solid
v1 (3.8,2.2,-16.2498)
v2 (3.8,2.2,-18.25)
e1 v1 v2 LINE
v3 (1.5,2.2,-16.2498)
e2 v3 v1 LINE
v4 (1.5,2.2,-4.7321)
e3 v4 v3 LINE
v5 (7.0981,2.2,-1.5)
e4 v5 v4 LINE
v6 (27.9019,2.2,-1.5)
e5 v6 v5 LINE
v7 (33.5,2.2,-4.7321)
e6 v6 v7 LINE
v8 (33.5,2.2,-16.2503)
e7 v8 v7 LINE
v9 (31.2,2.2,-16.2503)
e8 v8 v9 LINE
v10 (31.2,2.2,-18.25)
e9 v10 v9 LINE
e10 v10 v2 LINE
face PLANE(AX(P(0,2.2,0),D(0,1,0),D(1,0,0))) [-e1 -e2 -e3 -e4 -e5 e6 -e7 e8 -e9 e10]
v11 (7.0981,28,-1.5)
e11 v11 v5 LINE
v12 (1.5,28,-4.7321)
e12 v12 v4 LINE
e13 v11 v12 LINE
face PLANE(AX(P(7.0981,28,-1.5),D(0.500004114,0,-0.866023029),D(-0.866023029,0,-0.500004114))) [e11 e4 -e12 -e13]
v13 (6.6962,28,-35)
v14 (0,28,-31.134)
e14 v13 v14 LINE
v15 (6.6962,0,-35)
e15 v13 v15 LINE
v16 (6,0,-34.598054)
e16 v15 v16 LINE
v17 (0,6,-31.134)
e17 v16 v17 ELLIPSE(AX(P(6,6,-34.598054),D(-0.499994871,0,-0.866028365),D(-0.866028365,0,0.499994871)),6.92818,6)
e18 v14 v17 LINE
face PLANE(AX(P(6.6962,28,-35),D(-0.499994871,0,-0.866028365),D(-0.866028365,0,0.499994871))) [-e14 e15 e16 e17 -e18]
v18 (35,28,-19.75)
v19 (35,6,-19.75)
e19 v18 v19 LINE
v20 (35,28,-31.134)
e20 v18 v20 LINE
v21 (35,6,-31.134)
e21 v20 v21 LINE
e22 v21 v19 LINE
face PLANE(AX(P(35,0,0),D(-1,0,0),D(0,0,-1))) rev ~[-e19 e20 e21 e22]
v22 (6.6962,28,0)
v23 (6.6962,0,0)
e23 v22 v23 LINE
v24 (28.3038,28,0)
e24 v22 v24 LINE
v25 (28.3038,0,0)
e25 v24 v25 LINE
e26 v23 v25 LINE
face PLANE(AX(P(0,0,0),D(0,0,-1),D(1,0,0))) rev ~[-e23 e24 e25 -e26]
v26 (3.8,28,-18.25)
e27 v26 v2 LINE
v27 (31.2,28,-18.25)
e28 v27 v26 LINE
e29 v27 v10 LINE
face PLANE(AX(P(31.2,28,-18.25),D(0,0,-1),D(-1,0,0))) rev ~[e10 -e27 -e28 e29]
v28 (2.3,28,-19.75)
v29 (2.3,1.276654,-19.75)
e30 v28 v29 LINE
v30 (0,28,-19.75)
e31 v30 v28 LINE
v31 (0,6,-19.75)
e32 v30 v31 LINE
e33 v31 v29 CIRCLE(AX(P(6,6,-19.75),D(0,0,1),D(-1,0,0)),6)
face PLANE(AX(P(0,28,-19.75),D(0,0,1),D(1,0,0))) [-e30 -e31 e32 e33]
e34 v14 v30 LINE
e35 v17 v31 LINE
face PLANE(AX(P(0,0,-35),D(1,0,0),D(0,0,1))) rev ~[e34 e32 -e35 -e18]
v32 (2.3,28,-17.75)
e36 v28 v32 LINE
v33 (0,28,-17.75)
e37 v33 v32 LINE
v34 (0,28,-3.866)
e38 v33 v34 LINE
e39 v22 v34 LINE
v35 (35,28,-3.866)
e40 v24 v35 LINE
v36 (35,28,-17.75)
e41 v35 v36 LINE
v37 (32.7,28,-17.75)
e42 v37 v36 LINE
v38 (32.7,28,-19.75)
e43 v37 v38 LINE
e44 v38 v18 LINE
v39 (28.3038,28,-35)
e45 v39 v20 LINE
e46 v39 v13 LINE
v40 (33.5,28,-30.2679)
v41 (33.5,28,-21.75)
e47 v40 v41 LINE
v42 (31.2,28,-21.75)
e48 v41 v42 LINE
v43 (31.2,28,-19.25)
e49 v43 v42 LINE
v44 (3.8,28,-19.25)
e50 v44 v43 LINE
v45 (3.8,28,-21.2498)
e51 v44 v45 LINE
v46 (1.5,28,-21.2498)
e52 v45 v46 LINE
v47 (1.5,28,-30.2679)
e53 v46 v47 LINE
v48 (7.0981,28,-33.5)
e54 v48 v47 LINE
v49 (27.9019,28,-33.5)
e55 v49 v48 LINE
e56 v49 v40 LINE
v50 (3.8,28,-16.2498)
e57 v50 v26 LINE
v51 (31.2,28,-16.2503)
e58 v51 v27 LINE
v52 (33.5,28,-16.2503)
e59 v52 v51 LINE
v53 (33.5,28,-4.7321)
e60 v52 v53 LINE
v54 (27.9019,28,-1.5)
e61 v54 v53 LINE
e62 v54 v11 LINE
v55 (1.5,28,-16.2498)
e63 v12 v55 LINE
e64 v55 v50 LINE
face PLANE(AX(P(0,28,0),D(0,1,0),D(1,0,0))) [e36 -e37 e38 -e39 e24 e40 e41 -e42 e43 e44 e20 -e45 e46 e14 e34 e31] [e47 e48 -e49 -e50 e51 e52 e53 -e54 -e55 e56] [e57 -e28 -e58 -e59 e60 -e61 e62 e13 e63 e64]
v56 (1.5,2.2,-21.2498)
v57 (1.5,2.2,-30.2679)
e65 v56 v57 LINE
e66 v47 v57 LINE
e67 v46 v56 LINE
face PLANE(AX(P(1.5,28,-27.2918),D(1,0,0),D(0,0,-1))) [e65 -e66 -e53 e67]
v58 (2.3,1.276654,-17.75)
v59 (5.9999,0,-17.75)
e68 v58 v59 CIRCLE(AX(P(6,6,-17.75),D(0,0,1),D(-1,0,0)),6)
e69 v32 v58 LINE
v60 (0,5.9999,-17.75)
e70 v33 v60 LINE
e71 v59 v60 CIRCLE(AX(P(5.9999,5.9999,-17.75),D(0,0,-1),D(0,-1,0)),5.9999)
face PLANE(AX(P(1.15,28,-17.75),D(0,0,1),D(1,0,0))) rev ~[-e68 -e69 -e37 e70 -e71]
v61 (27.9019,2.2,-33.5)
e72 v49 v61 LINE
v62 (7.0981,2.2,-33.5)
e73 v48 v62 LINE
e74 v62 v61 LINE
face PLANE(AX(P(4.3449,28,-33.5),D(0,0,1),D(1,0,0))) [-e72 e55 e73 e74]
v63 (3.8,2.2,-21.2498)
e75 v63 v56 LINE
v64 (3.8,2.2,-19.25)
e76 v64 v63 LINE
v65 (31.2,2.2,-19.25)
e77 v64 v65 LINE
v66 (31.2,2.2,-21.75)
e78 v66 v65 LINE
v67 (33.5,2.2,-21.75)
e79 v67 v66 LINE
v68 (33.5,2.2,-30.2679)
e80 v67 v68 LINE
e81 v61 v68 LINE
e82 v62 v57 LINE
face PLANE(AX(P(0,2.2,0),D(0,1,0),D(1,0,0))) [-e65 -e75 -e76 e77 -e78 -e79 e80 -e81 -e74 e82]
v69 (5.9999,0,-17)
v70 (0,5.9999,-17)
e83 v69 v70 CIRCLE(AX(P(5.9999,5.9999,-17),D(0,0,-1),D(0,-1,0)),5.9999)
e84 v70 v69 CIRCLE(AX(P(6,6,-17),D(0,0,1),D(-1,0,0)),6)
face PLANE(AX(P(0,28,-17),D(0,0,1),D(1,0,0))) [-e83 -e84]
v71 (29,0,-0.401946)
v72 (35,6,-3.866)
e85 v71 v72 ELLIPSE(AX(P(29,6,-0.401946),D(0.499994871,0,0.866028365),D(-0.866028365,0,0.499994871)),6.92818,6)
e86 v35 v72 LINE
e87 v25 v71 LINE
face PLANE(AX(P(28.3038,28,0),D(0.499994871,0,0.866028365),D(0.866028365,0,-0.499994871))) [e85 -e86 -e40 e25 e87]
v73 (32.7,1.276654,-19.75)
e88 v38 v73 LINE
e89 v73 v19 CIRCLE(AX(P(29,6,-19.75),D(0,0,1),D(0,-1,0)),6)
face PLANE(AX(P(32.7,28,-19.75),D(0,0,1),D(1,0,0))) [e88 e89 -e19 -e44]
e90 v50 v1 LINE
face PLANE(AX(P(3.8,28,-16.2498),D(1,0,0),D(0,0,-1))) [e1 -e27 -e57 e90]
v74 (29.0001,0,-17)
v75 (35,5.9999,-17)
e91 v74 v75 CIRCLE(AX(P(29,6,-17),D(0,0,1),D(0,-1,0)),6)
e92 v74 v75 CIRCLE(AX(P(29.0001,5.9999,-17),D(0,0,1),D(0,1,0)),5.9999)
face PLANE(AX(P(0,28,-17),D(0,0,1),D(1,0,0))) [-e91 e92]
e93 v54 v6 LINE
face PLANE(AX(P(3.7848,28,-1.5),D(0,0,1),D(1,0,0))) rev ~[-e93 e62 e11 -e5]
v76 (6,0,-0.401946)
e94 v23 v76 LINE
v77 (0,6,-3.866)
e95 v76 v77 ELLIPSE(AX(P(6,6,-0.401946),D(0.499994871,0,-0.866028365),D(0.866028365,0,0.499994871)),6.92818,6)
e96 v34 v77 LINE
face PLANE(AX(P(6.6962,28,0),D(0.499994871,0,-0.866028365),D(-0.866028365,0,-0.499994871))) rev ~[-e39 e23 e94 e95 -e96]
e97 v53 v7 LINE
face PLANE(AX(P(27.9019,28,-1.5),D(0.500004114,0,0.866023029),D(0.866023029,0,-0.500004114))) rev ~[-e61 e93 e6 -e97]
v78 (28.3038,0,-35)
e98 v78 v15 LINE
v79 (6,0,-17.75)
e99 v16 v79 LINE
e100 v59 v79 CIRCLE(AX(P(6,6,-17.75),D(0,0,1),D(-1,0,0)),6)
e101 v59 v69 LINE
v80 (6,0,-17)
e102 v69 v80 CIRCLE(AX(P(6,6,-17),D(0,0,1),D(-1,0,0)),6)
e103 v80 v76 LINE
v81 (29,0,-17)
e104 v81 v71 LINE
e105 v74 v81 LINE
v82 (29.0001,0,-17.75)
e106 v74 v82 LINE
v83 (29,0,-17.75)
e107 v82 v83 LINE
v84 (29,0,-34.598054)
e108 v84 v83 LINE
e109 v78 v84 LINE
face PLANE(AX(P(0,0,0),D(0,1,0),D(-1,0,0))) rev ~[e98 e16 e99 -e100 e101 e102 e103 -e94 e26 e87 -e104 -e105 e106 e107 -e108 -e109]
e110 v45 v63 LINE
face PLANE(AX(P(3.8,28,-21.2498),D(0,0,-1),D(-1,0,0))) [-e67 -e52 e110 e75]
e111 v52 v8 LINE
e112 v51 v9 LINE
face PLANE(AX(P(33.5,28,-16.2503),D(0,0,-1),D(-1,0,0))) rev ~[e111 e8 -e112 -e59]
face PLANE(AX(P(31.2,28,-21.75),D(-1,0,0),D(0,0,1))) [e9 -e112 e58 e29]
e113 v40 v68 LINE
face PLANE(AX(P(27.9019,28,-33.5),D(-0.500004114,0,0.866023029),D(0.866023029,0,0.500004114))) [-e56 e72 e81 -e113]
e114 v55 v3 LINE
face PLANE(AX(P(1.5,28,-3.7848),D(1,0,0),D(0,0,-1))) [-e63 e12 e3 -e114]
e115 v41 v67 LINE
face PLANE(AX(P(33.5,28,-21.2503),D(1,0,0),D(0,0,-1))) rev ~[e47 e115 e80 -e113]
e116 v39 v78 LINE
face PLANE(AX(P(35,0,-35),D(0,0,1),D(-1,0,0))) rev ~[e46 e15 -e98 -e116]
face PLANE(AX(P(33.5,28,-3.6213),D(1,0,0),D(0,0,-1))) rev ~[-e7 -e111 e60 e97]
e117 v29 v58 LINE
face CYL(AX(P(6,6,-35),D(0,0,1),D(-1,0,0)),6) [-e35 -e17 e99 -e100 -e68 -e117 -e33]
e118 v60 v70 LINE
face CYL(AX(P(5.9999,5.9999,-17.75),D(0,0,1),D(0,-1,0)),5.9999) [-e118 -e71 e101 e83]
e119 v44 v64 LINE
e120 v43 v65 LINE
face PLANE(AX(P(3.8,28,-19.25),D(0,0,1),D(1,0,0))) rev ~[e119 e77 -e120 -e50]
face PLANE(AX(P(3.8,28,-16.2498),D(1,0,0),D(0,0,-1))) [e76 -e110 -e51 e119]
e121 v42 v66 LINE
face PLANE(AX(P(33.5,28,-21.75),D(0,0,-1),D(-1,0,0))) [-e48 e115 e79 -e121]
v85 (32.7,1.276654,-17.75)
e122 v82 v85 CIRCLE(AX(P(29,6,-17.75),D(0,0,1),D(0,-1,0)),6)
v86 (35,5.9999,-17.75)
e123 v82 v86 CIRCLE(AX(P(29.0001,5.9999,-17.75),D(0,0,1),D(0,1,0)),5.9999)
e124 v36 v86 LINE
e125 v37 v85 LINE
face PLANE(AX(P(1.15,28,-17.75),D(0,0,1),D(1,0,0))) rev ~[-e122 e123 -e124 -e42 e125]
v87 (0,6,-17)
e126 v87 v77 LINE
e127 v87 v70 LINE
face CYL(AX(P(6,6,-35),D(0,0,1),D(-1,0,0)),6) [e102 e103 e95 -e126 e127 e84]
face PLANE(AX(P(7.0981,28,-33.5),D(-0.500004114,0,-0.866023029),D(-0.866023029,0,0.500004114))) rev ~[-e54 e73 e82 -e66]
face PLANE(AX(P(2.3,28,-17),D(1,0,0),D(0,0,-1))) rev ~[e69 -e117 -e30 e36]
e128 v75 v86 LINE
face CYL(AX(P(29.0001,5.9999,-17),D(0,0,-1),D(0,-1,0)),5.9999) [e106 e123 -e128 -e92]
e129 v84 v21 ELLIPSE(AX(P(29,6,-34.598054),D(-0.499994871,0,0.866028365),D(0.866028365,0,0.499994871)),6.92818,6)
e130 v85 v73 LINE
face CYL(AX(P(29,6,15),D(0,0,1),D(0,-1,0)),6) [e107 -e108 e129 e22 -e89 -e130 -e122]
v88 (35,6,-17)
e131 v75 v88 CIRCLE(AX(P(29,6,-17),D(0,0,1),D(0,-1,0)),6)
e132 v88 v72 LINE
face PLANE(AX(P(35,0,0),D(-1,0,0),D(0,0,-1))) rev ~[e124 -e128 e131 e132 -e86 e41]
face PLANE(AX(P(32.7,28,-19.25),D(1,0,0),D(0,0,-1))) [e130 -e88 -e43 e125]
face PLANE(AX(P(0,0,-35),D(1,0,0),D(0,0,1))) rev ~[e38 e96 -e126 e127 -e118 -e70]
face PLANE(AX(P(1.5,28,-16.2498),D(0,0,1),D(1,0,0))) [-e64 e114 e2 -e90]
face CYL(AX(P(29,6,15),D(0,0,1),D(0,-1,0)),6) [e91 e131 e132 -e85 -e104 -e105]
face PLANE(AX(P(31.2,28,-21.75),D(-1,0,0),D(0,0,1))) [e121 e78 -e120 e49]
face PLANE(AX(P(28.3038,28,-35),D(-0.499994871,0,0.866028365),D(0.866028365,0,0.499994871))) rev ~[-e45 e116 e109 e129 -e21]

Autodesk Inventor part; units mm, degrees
ref_plane "YZ Plane" through (0, 0, 0) normal (1, 0, 0) x (0, 1, 0)
ref_plane "XZ Plane" through (0, 0, 0) normal (0, 1, 0) x (-1, 0, 0)
ref_plane "XY Plane" through (0, 0, 0) normal (0, 0, 1) x (1, 0, 0)
sketch "Sketch1" plane through (0, 0, 0) normal (0, 1, 0) x (-1, 0, 0)
  line L0 (0, 0) -> (-35, 0)
  line L1 (-35, 0) -> (-35, -35)
  line L2 (-35, -35) -> (0, -35)
  line L3 (0, -35) -> (0, 0)
  dimension "d0" = 35
  dimension "d1" = 35
extrude "Extrusion1" add sketch "Sketch1" along normal blind 28
sketch "Sketch2" plane through (0, 28, 0) normal (0, 1, 0) x (1, 0, 0)
  line L0 (35, 19) -> (32.7, 19)
  line L1 (32.7, 19) -> (32.7, 17)
  line L2 (35, 19) -> (35, 17.125)
  line L3 (32.7, 17) -> (35, 17)
  line L4 (35, 17) -> (35, 17.125)
  point P0 (0, 0)
  point P1 (35, 35)
  dimension "d6" = 16
  dimension "d7" = 2.3
  dimension "d8" = 2
extrude "Extrusion2" cut sketch "Sketch2" against normal blind 28
pattern_linear "Rectangular Pattern1" count 2 spacing 32.7 along (-1, 0, 0) of "Extrusion2"
fillet "Fillet1" radius 6 2 edges at (35, 0, -8.5) (35, 0, -27)
fillet "Fillet2" radius 6 1 edges at (0, 0, -27)
sketch "Sketch3" plane through (0, 28, 0) normal (0, 1, 0) x (1, 0, 0)
  line L0 (6, 0) -> (0, 0) projected
  line L1 (0, 0) -> (0, 3)
  line L2 (0, 17) -> (0, 0) projected
  line L3 (0, 0) -> (3, 0)
  line L4 (0, 3) -> (3, 0)
  dimension "d16" = 3
extrude "Extrusion3" cut sketch "Sketch3" against normal blind 28
sketch "Sketch4" plane through (0, 28, 0) normal (0, 1, 0) x (1, 0, 0)
  line L0 (0, 19) -> (0, 35) projected
  line L1 (0, 35) -> (0, 32)
  line L2 (0, 35) -> (6, 35) projected
  line L3 (0, 35) -> (3, 35)
  line L4 (3, 35) -> (0, 32)
  point P0 (0, 0)
  dimension "d19" = 3
  dimension "d20" = 3
extrude "Extrusion4" cut sketch "Sketch4" against normal blind 28
sketch "Sketch5" plane through (0, 28, 0) normal (0, 1, 0) x (1, 0, 0)
  line L0 (35, 0) -> (35, 17) projected
  line L1 (35, 0) -> (32, 0)
  line L2 (3, 0) -> (35, 0) projected
  line L3 (35, 0) -> (35, 3)
  line L4 (35, 3) -> (32, 0)
  line L5 (29, 35) -> (35, 35) projected
  line L6 (35, 35) -> (35, 32)
  line L7 (35, 19) -> (35, 35) projected
  line L8 (35, 32) -> (32, 35)
  line L9 (32, 35) -> (35, 35)
  point P0 (0, 0)
  dimension "d23" = 3
  dimension "d24" = 3
  dimension "d25" = 3
extrude "Extrusion5" cut sketch "Sketch5" against normal blind 28
sketch "Sketch6" plane through (0, 28, 0) normal (0, 1, 0) x (1, 0, 0)
  line L0 (3, 0) -> (0, 3) projected
  line L1 (2.3, 17) -> (0, 17) projected
  line L2 (2, 15.75) -> (4.3, 15.75)
  line L3 (4.3, 15.75) -> (4.3, 21.75)
  line L4 (4.3, 21.75) -> (2, 21.75)
  line L5 (0, 19) -> (0, 32) projected
  line L6 (2, 21.75) -> (2, 30.75)
  line L7 (0, 3) -> (0, 5)
  line L8 (0, 17) -> (0, 3) projected
  line L9 (2, 5) -> (2, 15.75)
  line L10 (32, 35) -> (3, 35) projected
  line L11 (3, 35) -> (5, 35)
  line L12 (6, 0) -> (3, 0) projected
  line L13 (3, 0) -> (5, 0)
  line L14 (2.827, 3) -> (2, 3.8818)
  line L15 (2, 3.8818) -> (2, 5)
  line L16 (2.827, 3) -> (3.827, 2)
  line L17 (2.827, 3) -> (4.2412, 3) construction
  line L18 (1.743, 34.4232) -> (3.15, 33.0019)
  line L19 (3.15, 33.0019) -> (2, 31.8635)
  line L20 (2, 31.8635) -> (2, 30.75)
  line L21 (3.15, 33.0019) -> (4.0351, 33.5429)
  line L22 (4.0351, 33.5429) -> (30.1293, 33.5429)
  line L23 (35, 32) -> (32, 35) projected
  line L24 (32.0858, 32.8358) -> (31.3787, 33.5429)
  line L25 (31.3787, 33.5429) -> (30.1293, 33.5429)
  line L26 (35, 19) -> (35, 32) projected
  line L27 (33, 26.25) -> (33, 31.9216)
  line L28 (33, 31.9216) -> (32.0858, 32.8358)
  line L29 (33, 26.25) -> (33, 21.75)
  line L30 (35, 19) -> (32.7, 19) projected
  line L31 (33, 21.75) -> (30.7, 21.75)
  line L32 (30.7, 21.75) -> (30.7, 15.75)
  line L33 (30.7, 15.75) -> (33, 15.75)
  line L34 (33, 15.75) -> (33, 7.3052)
  line L35 (32, 0) -> (35, 3) projected
  line L36 (33.85, 1.85) -> (35.85, 1.85) construction
  line L37 (32.4358, 3.2642) -> (33, 3.8284)
  line L38 (33, 3.8284) -> (33, 7.3052)
  line L39 (27.667, 2) -> (31.1716, 2)
  line L40 (31.1716, 2) -> (32.4358, 3.2642)
  line L41 (27.667, 2) -> (3.827, 2)
  point P0 (0, 0)
  dimension "d31" = 2.3
  dimension "d32" = 6
  dimension "d33" = 2.3
  dimension "d34" = 9
  dimension "d35" = 2
  dimension "d36" = 2
  dimension "d37" = 2
  dimension "d42" = 45
  dimension "d43" = 2
  dimension "d48" = 4.5
  dimension "d49" = 2.3
  dimension "d50" = 6
  dimension "d51" = 2.3
  dimension "d52" = 2
extrude "Extrusion6" cut sketch "Sketch6" against normal blind 25.8
sketch "Sketch7" plane through (0, 28, 0) normal (0, 1, 0) x (1, 0, 0)
  line L0 (23.4542, 2) -> (23.9542, 2) construction
  line L1 (32.0858, 2.9142) -> (32.5858, 2.9142) construction
  line L2 (35, 32) -> (32, 35) projected
  line L3 (31.3787, 33.5429) -> (33, 31.9216) projected
  line L4 (2, 31.8635) -> (3.15, 33.0019) projected
  line L5 (2.8776, 32.7322) -> (3.3776, 32.7322) construction
  line L6 (32.4393, 2.5607) -> (31.3787, 1.5)
  line L7 (31.3787, 1.5) -> (23.4542, 1.5)
  line L8 (2.7741, 2.5108) -> (3.7848, 1.5)
  line L9 (3.7848, 1.5) -> (23.4542, 1.5)
  line L10 (2.7741, 2.5108) -> (1.5, 3.7848)
  line L11 (1.5, 3.7848) -> (1.5, 16.2498)
  line L12 (1.5, 16.2498) -> (3.8, 16.2498)
  line L13 (3.8, 16.2498) -> (3.8, 21.2498)
  line L14 (4.3, 21.75) -> (2, 21.75) projected
  line L15 (3.8, 21.2498) -> (1.5, 21.2498)
  line L16 (1.5, 21.2498) -> (1.5, 27.2918)
  line L17 (1.5, 27.2918) -> (1.5, 32.0617)
  line L18 (1.5, 32.0617) -> (2.5241, 33.0858)
  line L19 (2.5241, 33.0858) -> (3.4812, 34.0429)
  line L20 (3.4812, 34.0429) -> (18.3245, 34.0429)
  line L21 (18.3245, 34.0429) -> (31.5858, 34.0429)
  line L22 (31.5858, 34.0429) -> (32.5429, 33.0858)
  line L23 (32.4393, 2.5607) -> (33.5, 3.6213)
  line L24 (33.5, 3.6213) -> (33.5, 11.0333)
  line L25 (33.5, 11.0333) -> (33.5, 16.2503)
  line L26 (33.5, 16.2503) -> (31.2, 16.2503)
  line L27 (30.7, 21.75) -> (30.7, 15.75) projected
  line L28 (31.2, 16.2503) -> (31.2, 21.2503)
  line L29 (31.2, 21.2503) -> (33.5, 21.2503)
  line L30 (33.5, 21.2503) -> (33.5, 32.1287)
  line L31 (33.5, 32.1287) -> (32.5429, 33.0858)
  line L32 (4.0351, 33.5429) -> (31.3787, 33.5429) projected
  line L33 (4.0351, 33.5429) -> (31.3787, 33.5429)
  line L34 (33, 31.9216) -> (33, 21.75) projected
  line L35 (31.3787, 33.5429) -> (33, 31.9216)
  line L36 (33, 31.9216) -> (33, 21.75)
  line L37 (33, 21.75) -> (30.7, 21.75) projected
  line L38 (33, 21.75) -> (30.7, 21.75)
  line L39 (30.7, 21.75) -> (30.7, 15.75)
  line L40 (30.7, 15.75) -> (33, 15.75) projected
  line L41 (31.1716, 2) -> (3.827, 2)
  line L42 (3.827, 2) -> (2.827, 3) projected
  line L43 (2, 3.8818) -> (2, 15.75) projected
  line L44 (3.827, 2) -> (2, 3.8818)
  line L45 (2, 3.8818) -> (2, 15.75)
  line L46 (2, 15.75) -> (4.3, 15.75) projected
  line L47 (2, 15.75) -> (4.3, 15.75)
  line L48 (4.3, 15.75) -> (4.3, 21.75) projected
  line L49 (4.3, 15.75) -> (4.3, 21.75)
  line L50 (4.3, 21.75) -> (2, 21.75)
  line L51 (2, 21.75) -> (2, 31.8635) projected
  line L52 (2, 21.75) -> (2, 31.8635)
  line L53 (3.15, 33.0019) -> (4.0351, 33.5429) projected
  line L54 (2, 31.8635) -> (3.15, 33.0019)
  line L55 (33, 3.8284) -> (31.1716, 2) projected
  line L56 (31.1716, 2) -> (33, 3.8284)
  line L57 (33, 3.8284) -> (33, 15.75)
  line L58 (30.7, 15.75) -> (33, 15.75)
  point P0 (0, 0)
  dimension "d65" = 0.5
  dimension "d70" = 12.465
  dimension "d71" = 2.3
  dimension "d72" = 5
  dimension "d73" = 90
  dimension "d74" = 2.3
  dimension "d76" = 2.3
  dimension "d77" = 5
  dimension "d78" = 2.3
extrude "Extrusion7" cut sketch "Sketch7" against normal blind 25.8
sketch "Sketch8" plane through (0, 28, 0) normal (0, 1, 0) x (1, 0, 0)
  line L0 (32, 35) -> (35, 32) projected
  line L1 (33.2498, 33.7502) -> (34.7498, 33.7502) construction
  line L2 (29, 35) -> (32, 35) projected
  line L3 (28.3787, 33.5) -> (31.3787, 33.5)
  line L4 (31.3787, 33.5) -> (32.1892, 32.6895)
  line L5 (33.5, 32.1287) -> (33.5, 21.2503) projected
  line L6 (33.5, 31.3787) -> (32.1892, 32.6895)
  line L7 (33.5, 31.3787) -> (33.5, 32.1287)
  line L8 (31.5858, 34.0429) -> (33.5, 32.1287) projected
  line L9 (33.5, 32.1287) -> (31.5858, 34.0429)
  line L10 (3.4812, 34.0429) -> (31.5858, 34.0429) projected
  line L11 (31.5858, 34.0429) -> (3.4812, 34.0429)
  line L12 (1.5, 32.0617) -> (3.4812, 34.0429) projected
  line L13 (3.4812, 34.0429) -> (1.5, 32.0617)
  line L14 (3, 35) -> (0, 32) projected
  line L15 (1.7099, 33.7099) -> (3.2099, 33.7099) construction
  line L16 (2.7705, 32.6492) -> (1.5, 31.3787)
  line L17 (1.5, 21.2498) -> (1.5, 32.0617) projected
  line L18 (4.3449, 35) -> (5.8449, 35) construction
  line L19 (4.3449, 33.5) -> (3.6213, 33.5)
  line L20 (3.6213, 33.5) -> (2.7705, 32.6492)
  line L21 (1.5, 31.3787) -> (1.5, 32.0617)
  line L22 (4.3449, 33.5) -> (28.3787, 33.5)
  point P0 (0, 0)
  dimension "d83" = 1.5
  dimension "d87" = 1.5
  dimension "d89" = 1.5
extrude "Extrusion8" add sketch "Sketch8" against normal blind 25.8
sketch "Sketch9" plane through (0, 28, 0) normal (0, 1, 0) x (1, 0, 0)
  line L0 (0, 3) -> (3, 0) projected
  line L1 (0, 3) -> (5.1962, 0)
  line L2 (3, 0) -> (32, 0) projected
  line L3 (0, 3) -> (6, 3) construction
  line L4 (5.1962, 0) -> (3, 0)
  line L5 (3, 0) -> (0, 3)
  line L6 (35, 17) -> (35, 3) projected
  line L7 (35, 3) -> (29.8038, 0)
  line L8 (32, 0) -> (29, 0) projected
  line L9 (35, 3) -> (41, 3) construction
  line L10 (29.8038, 0) -> (32, 0)
  line L11 (32, 0) -> (35, 3)
  line L12 (35, 19) -> (35, 32) projected
  line L13 (35, 32) -> (29.8038, 35)
  line L14 (29, 35) -> (32, 35) projected
  line L15 (35, 32) -> (41, 32) construction
  line L16 (29.8038, 35) -> (32, 35)
  line L17 (32, 35) -> (35, 32)
  line L18 (0, 19) -> (0, 32) projected
  line L19 (0, 32) -> (5.1962, 35)
  line L20 (3, 35) -> (6, 35) projected
  line L21 (0, 32) -> (6, 32) construction
  line L22 (5.1962, 35) -> (3, 35)
  line L23 (3, 35) -> (0, 32)
  line L24 (0, 32) -> (3, 35) projected
  point P0 (0, 0)
  dimension "d93" = 30
  dimension "d94" = 150
  dimension "d95" = 150
  dimension "d96" = 30
extrude "Extrusion9" cut sketch "Sketch9" against normal blind 28
sketch "Sketch10" plane through (0, 28, 0) normal (0, 1, 0) x (1, 0, 0)
  line L0 (1.5, 3.7848) -> (1.5, 16.2498) projected
  line L1 (1.5, 3.7848) -> (5.4575, 1.5)
  line L2 (31.3787, 1.5) -> (3.7848, 1.5) projected
  line L3 (1.5, 3.7848) -> (6.0697, 3.7848) construction
  line L4 (5.4575, 1.5) -> (3.7848, 1.5)
  line L5 (3.7848, 1.5) -> (1.5, 3.7848) projected
  line L6 (3.7848, 1.5) -> (1.5, 3.7848)
  line L7 (33.5, 16.2503) -> (33.5, 3.6213) projected
  line L8 (33.5, 3.6213) -> (29.8258, 1.5)
  line L9 (33.5, 3.6213) -> (37.7426, 3.6213) construction
  line L10 (33.5, 3.6213) -> (31.3787, 1.5) projected
  line L11 (29.8258, 1.5) -> (31.3787, 1.5)
  line L12 (31.3787, 1.5) -> (33.5, 3.6213)
  line L13 (33.5, 31.3787) -> (33.5, 21.2503) projected
  line L14 (33.5, 31.3787) -> (29.8258, 33.5)
  line L15 (3.6213, 33.5) -> (31.3787, 33.5) projected
  line L16 (33.5, 31.3787) -> (37.7426, 31.3787) construction
  line L17 (29.8258, 33.5) -> (31.3787, 33.5)
  line L18 (31.3787, 33.5) -> (33.5, 31.3787)
  line L19 (1.5, 31.3787) -> (3.6213, 33.5) projected
  line L20 (1.5, 31.3787) -> (5.1742, 33.5)
  line L21 (1.5, 31.3787) -> (5.7426, 31.3787) construction
  line L22 (5.1742, 33.5) -> (3.6213, 33.5)
  line L23 (3.6213, 33.5) -> (1.5, 31.3787)
  point P0 (0, 0)
  dimension "d99" = 30
  dimension "d100" = 150
  dimension "d101" = 150
  dimension "d102" = 30
extrude "Extrusion10" add sketch "Sketch10" against normal blind 25.8
sketch "Sketch11" plane through (0, 28, 0) normal (0, 1, 0) x (1, 0, 0)
  line L0 (0, 3) -> (5.1962, 0) projected
  line L1 (3.036, 1.2472) -> (4.536, 1.2472) construction
  line L2 (3.786, 2.5462) -> (1.5, 3.866)
  line L3 (1.5, 3.7848) -> (5.4575, 1.5) projected
  line L4 (1.5, 3.866) -> (1.5, 3.7848)
  line L5 (1.5, 3.7848) -> (5.4575, 1.5)
  line L6 (5.4575, 1.5) -> (5.5981, 1.5)
  line L7 (29.8258, 1.5) -> (5.4575, 1.5) projected
  line L8 (5.5981, 1.5) -> (3.786, 2.5462)
  line L9 (29.5815, 1.5) -> (29.8258, 1.5)
  line L10 (33.5, 3.6213) -> (29.8258, 1.5) projected
  line L11 (29.8258, 1.5) -> (33.5, 3.6213)
  line L12 (29.8038, 0) -> (35, 3) projected
  line L13 (32.0253, 1.2826) -> (33.5253, 1.2826) construction
  line L14 (31.2753, 2.5816) -> (33.5, 3.866)
  line L15 (33.5, 16.2503) -> (33.5, 3.6213) projected
  line L16 (33.5, 3.866) -> (33.5, 3.6213)
  line L17 (31.2753, 2.5816) -> (29.4019, 1.5)
  line L18 (29.5815, 1.5) -> (29.4019, 1.5)
  line L19 (29.8038, 35) -> (35, 32) projected
  line L20 (29.8258, 33.5) -> (33.5, 31.3787) projected
  line L21 (32.0253, 33.7174) -> (33.5253, 33.7174) construction
  line L22 (31.2753, 32.4184) -> (29.4019, 33.5)
  line L23 (29.8258, 33.5) -> (5.1742, 33.5) projected
  line L24 (29.8258, 33.5) -> (29.4019, 33.5)
  line L25 (29.8258, 33.5) -> (33.5, 31.3787)
  line L26 (33.5, 31.3787) -> (33.5, 31.134)
  line L27 (33.5, 31.3787) -> (33.5, 21.2503) projected
  line L28 (31.2753, 32.4184) -> (33.5, 31.134)
  line L29 (5.1962, 35) -> (0, 32) projected
  line L30 (2.5981, 33.5) -> (4.0981, 33.5) construction
  line L31 (3.3481, 32.201) -> (1.606, 31.1952)
  line L32 (1.5, 21.2498) -> (1.5, 31.3787) projected
  line L33 (5.1742, 33.5) -> (1.5, 31.3787) projected
  line L34 (1.5, 31.3787) -> (5.1742, 33.5)
  line L35 (5.1742, 33.5) -> (5.5981, 33.5)
  line L36 (3.3481, 32.201) -> (5.5981, 33.5)
  line L37 (1.606, 31.1952) -> (1.5, 31.134)
  line L38 (1.5, 31.3787) -> (1.5, 31.134)
  point P0 (0, 0)
  dimension "d105" = 1.5
  dimension "d109" = 1.5
  dimension "d111" = 1.5
  dimension "d113" = 1.5
extrude "Extrusion11" add sketch "Sketch11" against normal blind 25.8
sketch "Sketch12" plane through (0, 28, 0) normal (0, 1, 0) x (1, 0, 0)
  line L0 (32.7, 19) -> (32.95, 19) construction
  line L1 (35, 19) -> (35, 32) projected
  line L2 (32.7, 19) -> (32.7, 17) projected
  line L3 (32.7, 19.25) -> (34.2, 19.25) construction
  line L4 (32.7, 20.75) -> (31.2, 20.75)
  line L5 (31.2, 21.2503) -> (31.2, 16.2503) projected
  line L6 (33.5, 21.2503) -> (31.2, 21.2503) projected
  line L7 (31.2, 21.2503) -> (31.2, 20.75)
  line L8 (33.5, 31.134) -> (33.5, 21.2503) projected
  line L9 (31.2, 21.2503) -> (33.5, 21.2503)
  line L10 (33.5, 21.2503) -> (33.5, 20.75)
  line L11 (33.5, 20.75) -> (32.7, 20.75)
  point P0 (0, 0)
  dimension "d117" = 0.25
  dimension "d119" = 1.5
extrude "Extrusion12" cut sketch "Sketch12" against normal blind 25.8
sketch "Sketch13" plane through (0, 28, 0) normal (0, 1, 0) x (1, 0, 0)
  line L0 (32.7, 19) -> (35, 19) projected
  line L1 (32.7, 19) -> (32.7, 19.25)
  line L2 (32.7, 19.25) -> (35, 19.25)
  line L3 (35, 19.25) -> (35, 19)
  line L4 (32.7, 17) -> (32.7, 19) projected
  line L5 (35, 19) -> (32.7, 19)
  point P0 (0, 0)
  dimension "d123" = 0.25
extrude "Extrusion13" cut sketch "Sketch13" against normal blind 28
sketch "Sketch14" plane through (0, 28, 0) normal (0, 1, 0) x (1, 0, 0)
  line L0 (32.7, 19.25) -> (35, 19.25) projected
  line L1 (32.7, 19.25) -> (32.7, 19.75)
  line L2 (32.7, 19.75) -> (35, 19.75)
  line L3 (35, 19.25) -> (35, 32) projected
  line L4 (35, 19.75) -> (35, 19.25)
  line L5 (32.7, 17) -> (32.7, 19.25) projected
  line L6 (35, 19.25) -> (32.7, 19.25)
  line L7 (0, 19) -> (2.3, 19) projected
  line L8 (0, 19) -> (0, 19.75)
  line L9 (0, 32) -> (0, 19) projected
  line L10 (0, 19.75) -> (2.3, 19.75)
  line L11 (2.3, 19) -> (2.3, 17) projected
  line L12 (2.3, 19.75) -> (2.3, 19)
  line L13 (2.3, 19) -> (0, 19)
  point P0 (0, 0)
  dimension "d129" = 0.5
  dimension "d130" = 0.75
extrude "Extrusion14" cut sketch "Sketch14" against normal blind 28
sketch "Sketch15" plane through (0, 28, 0) normal (0, 1, 0) x (1, 0, 0)
  line L0 (0, 19.75) -> (2.3, 19.75) projected
  line L1 (1.15, 17.75) -> (0, 17.75)
  line L2 (0, 17) -> (2.3, 17) projected
  line L3 (0, 17.75) -> (0, 17)
  line L4 (0, 17) -> (2.3, 17)
  line L5 (2.3, 19.75) -> (2.3, 17) projected
  line L6 (1.15, 17.75) -> (2.3, 17.75)
  line L7 (33.2558, 17.75) -> (32.7, 17.75)
  line L8 (32.7, 17) -> (35, 17)
  line L9 (35, 17) -> (35, 17.75)
  line L10 (35, 17.75) -> (33.2558, 17.75)
  line L11 (32.7, 17.75) -> (2.3, 17.75)
  line L12 (2.3, 17) -> (32.7, 17)
  point P0 (0, 0)
extrude "Extrusion15" add sketch "Sketch15" against normal blind 28
fillet "Fillet5" radius 6 2 edges at (35, 0, -17.375) (0, 0, -17.375)
sketch "Sketch16" plane through (0, 28, 0) normal (0, 1, 0) x (1, 0, 0)
  line L0 (3.8, 16.2498) -> (3.8, 17) projected
  line L1 (31.2, 17.75) -> (3.8, 17.75) projected
  line L2 (3.8, 17) -> (31.2, 17)
  line L3 (31.2, 17) -> (31.2, 17.75)
  line L4 (31.2, 17.75) -> (3.8, 17.75)
  line L5 (3.8, 17.75) -> (3.8, 17)
  point P0 (0, 0)
extrude "Extrusion16" cut sketch "Sketch16" against normal blind 25.8
sketch "Sketch17" plane through (0, 28, 0) normal (0, 1, 0) x (1, 0, 0)
  line L0 (33.5, 20.75) -> (31.2, 20.75) projected
  line L1 (33.5, 31.134) -> (33.5, 20.75) projected
  line L2 (31.2, 20.75) -> (33.5, 20.75)
  line L3 (33.5, 20.75) -> (33.5, 21.75)
  line L4 (33.5, 21.75) -> (31.2, 21.75)
  line L5 (31.2, 21.75) -> (31.2, 20.75)
  point P0 (0, 0)
  dimension "d144" = 1
extrude "Extrusion17" add sketch "Sketch17" against normal blind 25.8
sketch "Sketch18" plane through (0, 28, 0) normal (0, 1, 0) x (1, 0, 0)
  line L0 (31.2, 21.75) -> (31.2, 16.2503) projected
  line L1 (31.2, 18.25) -> (31.2, 19.25)
  line L2 (3.8, 16.2498) -> (3.8, 21.2498) projected
  line L3 (3.8, 18.25) -> (3.8, 19.25)
  line L4 (3.8, 19.25) -> (31.2, 19.25)
  line L5 (31.2, 18.25) -> (3.8, 18.25)
  point P0 (0, 0)
  point P1 (2.3, 17.75)
  dimension "d148" = 1
extrude "Extrusion18" add sketch "Sketch18" against normal blind 25.8
sketch "Sketch19" plane through (0, 28, 0) normal (0, 1, 0) x (1, 0, 0)
  line L0 (0, 3) -> (5.1962, 0) projected
  line L1 (5.1962, 0) -> (6.6962, 0)
  line L2 (6, 0) -> (5.1962, 0) projected
  line L3 (6.6962, 0) -> (0, 3.866)
  line L4 (0, 3) -> (0, 17.75) projected
  line L5 (0, 3) -> (0, 4.5)
  point P0 (0, 0)
  dimension "d154" = 1.5
  dimension "d155" = 30
  dimension "d156" = 1.5
extrude "Extrusion19" cut sketch "Sketch19" against normal blind 28
sketch "Sketch20" plane through (0, 28, 0) normal (0, 1, 0) x (1, 0, 0)
  line L0 (29.8038, 0) -> (35, 3) projected
  line L1 (29.8038, 0) -> (28.3038, 0)
  line L2 (6.6962, 0) -> (29.8038, 0) projected
  line L3 (28.3038, 0) -> (35, 3.866)
  line L4 (35, 3) -> (35, 17.75) projected
  line L5 (35, 3.866) -> (35, 3)
  line L6 (35, 3) -> (29.8038, 0)
  line L7 (28.3038, 0) -> (29.8038, 0)
  line L8 (35, 32) -> (29.8038, 35) projected
  line L9 (29.8038, 35) -> (28.3038, 35)
  line L10 (28.3038, 35) -> (35, 31.134)
  line L11 (35, 19.75) -> (35, 32) projected
  line L12 (35, 31.134) -> (35, 32)
  line L13 (35, 32) -> (29.8038, 35)
  line L14 (0, 32) -> (5.1962, 35) projected
  line L15 (5.1962, 35) -> (6.6962, 35)
  line L16 (29, 35) -> (6, 35) projected
  line L17 (6.6962, 35) -> (0, 31.134)
  line L18 (0, 19.75) -> (0, 32) projected
  line L19 (0, 32) -> (0, 31.134)
  line L20 (0, 32) -> (5.1962, 35)
  point P0 (0, 0)
  dimension "d159" = 1.5
  dimension "d160" = 30
  dimension "d161" = 1.5
  dimension "d162" = 30
  dimension "d163" = 1.5
extrude "Extrusion20" cut sketch "Sketch20" against normal blind 28
sketch "Sketch21" plane through (0, 28, 0) normal (0, 1, 0) x (1, 0, 0)
  line L0 (29.4019, 1.5) -> (5.5981, 1.5) projected
  line L1 (5.5981, 1.5) -> (7.0981, 1.5)
  line L2 (7.0981, 1.5) -> (1.5, 4.7321)
  line L3 (1.5, 3.866) -> (1.5, 16.2498) projected
  line L4 (1.5, 4.7321) -> (1.5, 3.866)
  line L5 (1.5, 3.866) -> (5.5981, 1.5) projected
  line L6 (1.5, 3.866) -> (5.5981, 1.5)
  line L7 (29.4019, 33.5) -> (5.5981, 33.5) projected
  line L8 (5.5981, 33.5) -> (7.0981, 33.5)
  line L9 (7.0981, 33.5) -> (1.5, 30.2679)
  line L10 (1.5, 21.2498) -> (1.5, 31.134) projected
  line L11 (1.5, 30.2679) -> (1.5, 31.134)
  line L12 (1.5, 31.134) -> (5.5981, 33.5)
  line L13 (29.4019, 33.5) -> (27.9019, 33.5)
  line L14 (27.9019, 33.5) -> (33.5, 30.2679)
  line L15 (33.5, 31.134) -> (33.5, 21.75) projected
  line L16 (33.5, 30.2679) -> (33.5, 31.134)
  line L17 (33.5, 31.134) -> (29.4019, 33.5)
  line L18 (29.4019, 1.5) -> (27.9019, 1.5)
  line L19 (27.9019, 1.5) -> (33.5, 4.7321)
  line L20 (33.5, 16.2503) -> (33.5, 3.866) projected
  line L21 (33.5, 4.7321) -> (33.5, 3.866)
  line L22 (33.5, 3.866) -> (29.4019, 1.5)
  point P0 (0, 0)
  dimension "d166" = 1.5
  dimension "d167" = 30
  dimension "d168" = 1.5
  dimension "d169" = 30
  dimension "d170" = 1.5
  dimension "d171" = 30
  dimension "d172" = 1.5
  dimension "d173" = 30
extrude "Extrusion21" add sketch "Sketch21" against normal blind 25.8
sketch "Sketch22" plane through (0, 28, 0) normal (0, 1, 0) x (1, 0, 0)
  point P0 (0, 0)
properties part number "Sarten"
